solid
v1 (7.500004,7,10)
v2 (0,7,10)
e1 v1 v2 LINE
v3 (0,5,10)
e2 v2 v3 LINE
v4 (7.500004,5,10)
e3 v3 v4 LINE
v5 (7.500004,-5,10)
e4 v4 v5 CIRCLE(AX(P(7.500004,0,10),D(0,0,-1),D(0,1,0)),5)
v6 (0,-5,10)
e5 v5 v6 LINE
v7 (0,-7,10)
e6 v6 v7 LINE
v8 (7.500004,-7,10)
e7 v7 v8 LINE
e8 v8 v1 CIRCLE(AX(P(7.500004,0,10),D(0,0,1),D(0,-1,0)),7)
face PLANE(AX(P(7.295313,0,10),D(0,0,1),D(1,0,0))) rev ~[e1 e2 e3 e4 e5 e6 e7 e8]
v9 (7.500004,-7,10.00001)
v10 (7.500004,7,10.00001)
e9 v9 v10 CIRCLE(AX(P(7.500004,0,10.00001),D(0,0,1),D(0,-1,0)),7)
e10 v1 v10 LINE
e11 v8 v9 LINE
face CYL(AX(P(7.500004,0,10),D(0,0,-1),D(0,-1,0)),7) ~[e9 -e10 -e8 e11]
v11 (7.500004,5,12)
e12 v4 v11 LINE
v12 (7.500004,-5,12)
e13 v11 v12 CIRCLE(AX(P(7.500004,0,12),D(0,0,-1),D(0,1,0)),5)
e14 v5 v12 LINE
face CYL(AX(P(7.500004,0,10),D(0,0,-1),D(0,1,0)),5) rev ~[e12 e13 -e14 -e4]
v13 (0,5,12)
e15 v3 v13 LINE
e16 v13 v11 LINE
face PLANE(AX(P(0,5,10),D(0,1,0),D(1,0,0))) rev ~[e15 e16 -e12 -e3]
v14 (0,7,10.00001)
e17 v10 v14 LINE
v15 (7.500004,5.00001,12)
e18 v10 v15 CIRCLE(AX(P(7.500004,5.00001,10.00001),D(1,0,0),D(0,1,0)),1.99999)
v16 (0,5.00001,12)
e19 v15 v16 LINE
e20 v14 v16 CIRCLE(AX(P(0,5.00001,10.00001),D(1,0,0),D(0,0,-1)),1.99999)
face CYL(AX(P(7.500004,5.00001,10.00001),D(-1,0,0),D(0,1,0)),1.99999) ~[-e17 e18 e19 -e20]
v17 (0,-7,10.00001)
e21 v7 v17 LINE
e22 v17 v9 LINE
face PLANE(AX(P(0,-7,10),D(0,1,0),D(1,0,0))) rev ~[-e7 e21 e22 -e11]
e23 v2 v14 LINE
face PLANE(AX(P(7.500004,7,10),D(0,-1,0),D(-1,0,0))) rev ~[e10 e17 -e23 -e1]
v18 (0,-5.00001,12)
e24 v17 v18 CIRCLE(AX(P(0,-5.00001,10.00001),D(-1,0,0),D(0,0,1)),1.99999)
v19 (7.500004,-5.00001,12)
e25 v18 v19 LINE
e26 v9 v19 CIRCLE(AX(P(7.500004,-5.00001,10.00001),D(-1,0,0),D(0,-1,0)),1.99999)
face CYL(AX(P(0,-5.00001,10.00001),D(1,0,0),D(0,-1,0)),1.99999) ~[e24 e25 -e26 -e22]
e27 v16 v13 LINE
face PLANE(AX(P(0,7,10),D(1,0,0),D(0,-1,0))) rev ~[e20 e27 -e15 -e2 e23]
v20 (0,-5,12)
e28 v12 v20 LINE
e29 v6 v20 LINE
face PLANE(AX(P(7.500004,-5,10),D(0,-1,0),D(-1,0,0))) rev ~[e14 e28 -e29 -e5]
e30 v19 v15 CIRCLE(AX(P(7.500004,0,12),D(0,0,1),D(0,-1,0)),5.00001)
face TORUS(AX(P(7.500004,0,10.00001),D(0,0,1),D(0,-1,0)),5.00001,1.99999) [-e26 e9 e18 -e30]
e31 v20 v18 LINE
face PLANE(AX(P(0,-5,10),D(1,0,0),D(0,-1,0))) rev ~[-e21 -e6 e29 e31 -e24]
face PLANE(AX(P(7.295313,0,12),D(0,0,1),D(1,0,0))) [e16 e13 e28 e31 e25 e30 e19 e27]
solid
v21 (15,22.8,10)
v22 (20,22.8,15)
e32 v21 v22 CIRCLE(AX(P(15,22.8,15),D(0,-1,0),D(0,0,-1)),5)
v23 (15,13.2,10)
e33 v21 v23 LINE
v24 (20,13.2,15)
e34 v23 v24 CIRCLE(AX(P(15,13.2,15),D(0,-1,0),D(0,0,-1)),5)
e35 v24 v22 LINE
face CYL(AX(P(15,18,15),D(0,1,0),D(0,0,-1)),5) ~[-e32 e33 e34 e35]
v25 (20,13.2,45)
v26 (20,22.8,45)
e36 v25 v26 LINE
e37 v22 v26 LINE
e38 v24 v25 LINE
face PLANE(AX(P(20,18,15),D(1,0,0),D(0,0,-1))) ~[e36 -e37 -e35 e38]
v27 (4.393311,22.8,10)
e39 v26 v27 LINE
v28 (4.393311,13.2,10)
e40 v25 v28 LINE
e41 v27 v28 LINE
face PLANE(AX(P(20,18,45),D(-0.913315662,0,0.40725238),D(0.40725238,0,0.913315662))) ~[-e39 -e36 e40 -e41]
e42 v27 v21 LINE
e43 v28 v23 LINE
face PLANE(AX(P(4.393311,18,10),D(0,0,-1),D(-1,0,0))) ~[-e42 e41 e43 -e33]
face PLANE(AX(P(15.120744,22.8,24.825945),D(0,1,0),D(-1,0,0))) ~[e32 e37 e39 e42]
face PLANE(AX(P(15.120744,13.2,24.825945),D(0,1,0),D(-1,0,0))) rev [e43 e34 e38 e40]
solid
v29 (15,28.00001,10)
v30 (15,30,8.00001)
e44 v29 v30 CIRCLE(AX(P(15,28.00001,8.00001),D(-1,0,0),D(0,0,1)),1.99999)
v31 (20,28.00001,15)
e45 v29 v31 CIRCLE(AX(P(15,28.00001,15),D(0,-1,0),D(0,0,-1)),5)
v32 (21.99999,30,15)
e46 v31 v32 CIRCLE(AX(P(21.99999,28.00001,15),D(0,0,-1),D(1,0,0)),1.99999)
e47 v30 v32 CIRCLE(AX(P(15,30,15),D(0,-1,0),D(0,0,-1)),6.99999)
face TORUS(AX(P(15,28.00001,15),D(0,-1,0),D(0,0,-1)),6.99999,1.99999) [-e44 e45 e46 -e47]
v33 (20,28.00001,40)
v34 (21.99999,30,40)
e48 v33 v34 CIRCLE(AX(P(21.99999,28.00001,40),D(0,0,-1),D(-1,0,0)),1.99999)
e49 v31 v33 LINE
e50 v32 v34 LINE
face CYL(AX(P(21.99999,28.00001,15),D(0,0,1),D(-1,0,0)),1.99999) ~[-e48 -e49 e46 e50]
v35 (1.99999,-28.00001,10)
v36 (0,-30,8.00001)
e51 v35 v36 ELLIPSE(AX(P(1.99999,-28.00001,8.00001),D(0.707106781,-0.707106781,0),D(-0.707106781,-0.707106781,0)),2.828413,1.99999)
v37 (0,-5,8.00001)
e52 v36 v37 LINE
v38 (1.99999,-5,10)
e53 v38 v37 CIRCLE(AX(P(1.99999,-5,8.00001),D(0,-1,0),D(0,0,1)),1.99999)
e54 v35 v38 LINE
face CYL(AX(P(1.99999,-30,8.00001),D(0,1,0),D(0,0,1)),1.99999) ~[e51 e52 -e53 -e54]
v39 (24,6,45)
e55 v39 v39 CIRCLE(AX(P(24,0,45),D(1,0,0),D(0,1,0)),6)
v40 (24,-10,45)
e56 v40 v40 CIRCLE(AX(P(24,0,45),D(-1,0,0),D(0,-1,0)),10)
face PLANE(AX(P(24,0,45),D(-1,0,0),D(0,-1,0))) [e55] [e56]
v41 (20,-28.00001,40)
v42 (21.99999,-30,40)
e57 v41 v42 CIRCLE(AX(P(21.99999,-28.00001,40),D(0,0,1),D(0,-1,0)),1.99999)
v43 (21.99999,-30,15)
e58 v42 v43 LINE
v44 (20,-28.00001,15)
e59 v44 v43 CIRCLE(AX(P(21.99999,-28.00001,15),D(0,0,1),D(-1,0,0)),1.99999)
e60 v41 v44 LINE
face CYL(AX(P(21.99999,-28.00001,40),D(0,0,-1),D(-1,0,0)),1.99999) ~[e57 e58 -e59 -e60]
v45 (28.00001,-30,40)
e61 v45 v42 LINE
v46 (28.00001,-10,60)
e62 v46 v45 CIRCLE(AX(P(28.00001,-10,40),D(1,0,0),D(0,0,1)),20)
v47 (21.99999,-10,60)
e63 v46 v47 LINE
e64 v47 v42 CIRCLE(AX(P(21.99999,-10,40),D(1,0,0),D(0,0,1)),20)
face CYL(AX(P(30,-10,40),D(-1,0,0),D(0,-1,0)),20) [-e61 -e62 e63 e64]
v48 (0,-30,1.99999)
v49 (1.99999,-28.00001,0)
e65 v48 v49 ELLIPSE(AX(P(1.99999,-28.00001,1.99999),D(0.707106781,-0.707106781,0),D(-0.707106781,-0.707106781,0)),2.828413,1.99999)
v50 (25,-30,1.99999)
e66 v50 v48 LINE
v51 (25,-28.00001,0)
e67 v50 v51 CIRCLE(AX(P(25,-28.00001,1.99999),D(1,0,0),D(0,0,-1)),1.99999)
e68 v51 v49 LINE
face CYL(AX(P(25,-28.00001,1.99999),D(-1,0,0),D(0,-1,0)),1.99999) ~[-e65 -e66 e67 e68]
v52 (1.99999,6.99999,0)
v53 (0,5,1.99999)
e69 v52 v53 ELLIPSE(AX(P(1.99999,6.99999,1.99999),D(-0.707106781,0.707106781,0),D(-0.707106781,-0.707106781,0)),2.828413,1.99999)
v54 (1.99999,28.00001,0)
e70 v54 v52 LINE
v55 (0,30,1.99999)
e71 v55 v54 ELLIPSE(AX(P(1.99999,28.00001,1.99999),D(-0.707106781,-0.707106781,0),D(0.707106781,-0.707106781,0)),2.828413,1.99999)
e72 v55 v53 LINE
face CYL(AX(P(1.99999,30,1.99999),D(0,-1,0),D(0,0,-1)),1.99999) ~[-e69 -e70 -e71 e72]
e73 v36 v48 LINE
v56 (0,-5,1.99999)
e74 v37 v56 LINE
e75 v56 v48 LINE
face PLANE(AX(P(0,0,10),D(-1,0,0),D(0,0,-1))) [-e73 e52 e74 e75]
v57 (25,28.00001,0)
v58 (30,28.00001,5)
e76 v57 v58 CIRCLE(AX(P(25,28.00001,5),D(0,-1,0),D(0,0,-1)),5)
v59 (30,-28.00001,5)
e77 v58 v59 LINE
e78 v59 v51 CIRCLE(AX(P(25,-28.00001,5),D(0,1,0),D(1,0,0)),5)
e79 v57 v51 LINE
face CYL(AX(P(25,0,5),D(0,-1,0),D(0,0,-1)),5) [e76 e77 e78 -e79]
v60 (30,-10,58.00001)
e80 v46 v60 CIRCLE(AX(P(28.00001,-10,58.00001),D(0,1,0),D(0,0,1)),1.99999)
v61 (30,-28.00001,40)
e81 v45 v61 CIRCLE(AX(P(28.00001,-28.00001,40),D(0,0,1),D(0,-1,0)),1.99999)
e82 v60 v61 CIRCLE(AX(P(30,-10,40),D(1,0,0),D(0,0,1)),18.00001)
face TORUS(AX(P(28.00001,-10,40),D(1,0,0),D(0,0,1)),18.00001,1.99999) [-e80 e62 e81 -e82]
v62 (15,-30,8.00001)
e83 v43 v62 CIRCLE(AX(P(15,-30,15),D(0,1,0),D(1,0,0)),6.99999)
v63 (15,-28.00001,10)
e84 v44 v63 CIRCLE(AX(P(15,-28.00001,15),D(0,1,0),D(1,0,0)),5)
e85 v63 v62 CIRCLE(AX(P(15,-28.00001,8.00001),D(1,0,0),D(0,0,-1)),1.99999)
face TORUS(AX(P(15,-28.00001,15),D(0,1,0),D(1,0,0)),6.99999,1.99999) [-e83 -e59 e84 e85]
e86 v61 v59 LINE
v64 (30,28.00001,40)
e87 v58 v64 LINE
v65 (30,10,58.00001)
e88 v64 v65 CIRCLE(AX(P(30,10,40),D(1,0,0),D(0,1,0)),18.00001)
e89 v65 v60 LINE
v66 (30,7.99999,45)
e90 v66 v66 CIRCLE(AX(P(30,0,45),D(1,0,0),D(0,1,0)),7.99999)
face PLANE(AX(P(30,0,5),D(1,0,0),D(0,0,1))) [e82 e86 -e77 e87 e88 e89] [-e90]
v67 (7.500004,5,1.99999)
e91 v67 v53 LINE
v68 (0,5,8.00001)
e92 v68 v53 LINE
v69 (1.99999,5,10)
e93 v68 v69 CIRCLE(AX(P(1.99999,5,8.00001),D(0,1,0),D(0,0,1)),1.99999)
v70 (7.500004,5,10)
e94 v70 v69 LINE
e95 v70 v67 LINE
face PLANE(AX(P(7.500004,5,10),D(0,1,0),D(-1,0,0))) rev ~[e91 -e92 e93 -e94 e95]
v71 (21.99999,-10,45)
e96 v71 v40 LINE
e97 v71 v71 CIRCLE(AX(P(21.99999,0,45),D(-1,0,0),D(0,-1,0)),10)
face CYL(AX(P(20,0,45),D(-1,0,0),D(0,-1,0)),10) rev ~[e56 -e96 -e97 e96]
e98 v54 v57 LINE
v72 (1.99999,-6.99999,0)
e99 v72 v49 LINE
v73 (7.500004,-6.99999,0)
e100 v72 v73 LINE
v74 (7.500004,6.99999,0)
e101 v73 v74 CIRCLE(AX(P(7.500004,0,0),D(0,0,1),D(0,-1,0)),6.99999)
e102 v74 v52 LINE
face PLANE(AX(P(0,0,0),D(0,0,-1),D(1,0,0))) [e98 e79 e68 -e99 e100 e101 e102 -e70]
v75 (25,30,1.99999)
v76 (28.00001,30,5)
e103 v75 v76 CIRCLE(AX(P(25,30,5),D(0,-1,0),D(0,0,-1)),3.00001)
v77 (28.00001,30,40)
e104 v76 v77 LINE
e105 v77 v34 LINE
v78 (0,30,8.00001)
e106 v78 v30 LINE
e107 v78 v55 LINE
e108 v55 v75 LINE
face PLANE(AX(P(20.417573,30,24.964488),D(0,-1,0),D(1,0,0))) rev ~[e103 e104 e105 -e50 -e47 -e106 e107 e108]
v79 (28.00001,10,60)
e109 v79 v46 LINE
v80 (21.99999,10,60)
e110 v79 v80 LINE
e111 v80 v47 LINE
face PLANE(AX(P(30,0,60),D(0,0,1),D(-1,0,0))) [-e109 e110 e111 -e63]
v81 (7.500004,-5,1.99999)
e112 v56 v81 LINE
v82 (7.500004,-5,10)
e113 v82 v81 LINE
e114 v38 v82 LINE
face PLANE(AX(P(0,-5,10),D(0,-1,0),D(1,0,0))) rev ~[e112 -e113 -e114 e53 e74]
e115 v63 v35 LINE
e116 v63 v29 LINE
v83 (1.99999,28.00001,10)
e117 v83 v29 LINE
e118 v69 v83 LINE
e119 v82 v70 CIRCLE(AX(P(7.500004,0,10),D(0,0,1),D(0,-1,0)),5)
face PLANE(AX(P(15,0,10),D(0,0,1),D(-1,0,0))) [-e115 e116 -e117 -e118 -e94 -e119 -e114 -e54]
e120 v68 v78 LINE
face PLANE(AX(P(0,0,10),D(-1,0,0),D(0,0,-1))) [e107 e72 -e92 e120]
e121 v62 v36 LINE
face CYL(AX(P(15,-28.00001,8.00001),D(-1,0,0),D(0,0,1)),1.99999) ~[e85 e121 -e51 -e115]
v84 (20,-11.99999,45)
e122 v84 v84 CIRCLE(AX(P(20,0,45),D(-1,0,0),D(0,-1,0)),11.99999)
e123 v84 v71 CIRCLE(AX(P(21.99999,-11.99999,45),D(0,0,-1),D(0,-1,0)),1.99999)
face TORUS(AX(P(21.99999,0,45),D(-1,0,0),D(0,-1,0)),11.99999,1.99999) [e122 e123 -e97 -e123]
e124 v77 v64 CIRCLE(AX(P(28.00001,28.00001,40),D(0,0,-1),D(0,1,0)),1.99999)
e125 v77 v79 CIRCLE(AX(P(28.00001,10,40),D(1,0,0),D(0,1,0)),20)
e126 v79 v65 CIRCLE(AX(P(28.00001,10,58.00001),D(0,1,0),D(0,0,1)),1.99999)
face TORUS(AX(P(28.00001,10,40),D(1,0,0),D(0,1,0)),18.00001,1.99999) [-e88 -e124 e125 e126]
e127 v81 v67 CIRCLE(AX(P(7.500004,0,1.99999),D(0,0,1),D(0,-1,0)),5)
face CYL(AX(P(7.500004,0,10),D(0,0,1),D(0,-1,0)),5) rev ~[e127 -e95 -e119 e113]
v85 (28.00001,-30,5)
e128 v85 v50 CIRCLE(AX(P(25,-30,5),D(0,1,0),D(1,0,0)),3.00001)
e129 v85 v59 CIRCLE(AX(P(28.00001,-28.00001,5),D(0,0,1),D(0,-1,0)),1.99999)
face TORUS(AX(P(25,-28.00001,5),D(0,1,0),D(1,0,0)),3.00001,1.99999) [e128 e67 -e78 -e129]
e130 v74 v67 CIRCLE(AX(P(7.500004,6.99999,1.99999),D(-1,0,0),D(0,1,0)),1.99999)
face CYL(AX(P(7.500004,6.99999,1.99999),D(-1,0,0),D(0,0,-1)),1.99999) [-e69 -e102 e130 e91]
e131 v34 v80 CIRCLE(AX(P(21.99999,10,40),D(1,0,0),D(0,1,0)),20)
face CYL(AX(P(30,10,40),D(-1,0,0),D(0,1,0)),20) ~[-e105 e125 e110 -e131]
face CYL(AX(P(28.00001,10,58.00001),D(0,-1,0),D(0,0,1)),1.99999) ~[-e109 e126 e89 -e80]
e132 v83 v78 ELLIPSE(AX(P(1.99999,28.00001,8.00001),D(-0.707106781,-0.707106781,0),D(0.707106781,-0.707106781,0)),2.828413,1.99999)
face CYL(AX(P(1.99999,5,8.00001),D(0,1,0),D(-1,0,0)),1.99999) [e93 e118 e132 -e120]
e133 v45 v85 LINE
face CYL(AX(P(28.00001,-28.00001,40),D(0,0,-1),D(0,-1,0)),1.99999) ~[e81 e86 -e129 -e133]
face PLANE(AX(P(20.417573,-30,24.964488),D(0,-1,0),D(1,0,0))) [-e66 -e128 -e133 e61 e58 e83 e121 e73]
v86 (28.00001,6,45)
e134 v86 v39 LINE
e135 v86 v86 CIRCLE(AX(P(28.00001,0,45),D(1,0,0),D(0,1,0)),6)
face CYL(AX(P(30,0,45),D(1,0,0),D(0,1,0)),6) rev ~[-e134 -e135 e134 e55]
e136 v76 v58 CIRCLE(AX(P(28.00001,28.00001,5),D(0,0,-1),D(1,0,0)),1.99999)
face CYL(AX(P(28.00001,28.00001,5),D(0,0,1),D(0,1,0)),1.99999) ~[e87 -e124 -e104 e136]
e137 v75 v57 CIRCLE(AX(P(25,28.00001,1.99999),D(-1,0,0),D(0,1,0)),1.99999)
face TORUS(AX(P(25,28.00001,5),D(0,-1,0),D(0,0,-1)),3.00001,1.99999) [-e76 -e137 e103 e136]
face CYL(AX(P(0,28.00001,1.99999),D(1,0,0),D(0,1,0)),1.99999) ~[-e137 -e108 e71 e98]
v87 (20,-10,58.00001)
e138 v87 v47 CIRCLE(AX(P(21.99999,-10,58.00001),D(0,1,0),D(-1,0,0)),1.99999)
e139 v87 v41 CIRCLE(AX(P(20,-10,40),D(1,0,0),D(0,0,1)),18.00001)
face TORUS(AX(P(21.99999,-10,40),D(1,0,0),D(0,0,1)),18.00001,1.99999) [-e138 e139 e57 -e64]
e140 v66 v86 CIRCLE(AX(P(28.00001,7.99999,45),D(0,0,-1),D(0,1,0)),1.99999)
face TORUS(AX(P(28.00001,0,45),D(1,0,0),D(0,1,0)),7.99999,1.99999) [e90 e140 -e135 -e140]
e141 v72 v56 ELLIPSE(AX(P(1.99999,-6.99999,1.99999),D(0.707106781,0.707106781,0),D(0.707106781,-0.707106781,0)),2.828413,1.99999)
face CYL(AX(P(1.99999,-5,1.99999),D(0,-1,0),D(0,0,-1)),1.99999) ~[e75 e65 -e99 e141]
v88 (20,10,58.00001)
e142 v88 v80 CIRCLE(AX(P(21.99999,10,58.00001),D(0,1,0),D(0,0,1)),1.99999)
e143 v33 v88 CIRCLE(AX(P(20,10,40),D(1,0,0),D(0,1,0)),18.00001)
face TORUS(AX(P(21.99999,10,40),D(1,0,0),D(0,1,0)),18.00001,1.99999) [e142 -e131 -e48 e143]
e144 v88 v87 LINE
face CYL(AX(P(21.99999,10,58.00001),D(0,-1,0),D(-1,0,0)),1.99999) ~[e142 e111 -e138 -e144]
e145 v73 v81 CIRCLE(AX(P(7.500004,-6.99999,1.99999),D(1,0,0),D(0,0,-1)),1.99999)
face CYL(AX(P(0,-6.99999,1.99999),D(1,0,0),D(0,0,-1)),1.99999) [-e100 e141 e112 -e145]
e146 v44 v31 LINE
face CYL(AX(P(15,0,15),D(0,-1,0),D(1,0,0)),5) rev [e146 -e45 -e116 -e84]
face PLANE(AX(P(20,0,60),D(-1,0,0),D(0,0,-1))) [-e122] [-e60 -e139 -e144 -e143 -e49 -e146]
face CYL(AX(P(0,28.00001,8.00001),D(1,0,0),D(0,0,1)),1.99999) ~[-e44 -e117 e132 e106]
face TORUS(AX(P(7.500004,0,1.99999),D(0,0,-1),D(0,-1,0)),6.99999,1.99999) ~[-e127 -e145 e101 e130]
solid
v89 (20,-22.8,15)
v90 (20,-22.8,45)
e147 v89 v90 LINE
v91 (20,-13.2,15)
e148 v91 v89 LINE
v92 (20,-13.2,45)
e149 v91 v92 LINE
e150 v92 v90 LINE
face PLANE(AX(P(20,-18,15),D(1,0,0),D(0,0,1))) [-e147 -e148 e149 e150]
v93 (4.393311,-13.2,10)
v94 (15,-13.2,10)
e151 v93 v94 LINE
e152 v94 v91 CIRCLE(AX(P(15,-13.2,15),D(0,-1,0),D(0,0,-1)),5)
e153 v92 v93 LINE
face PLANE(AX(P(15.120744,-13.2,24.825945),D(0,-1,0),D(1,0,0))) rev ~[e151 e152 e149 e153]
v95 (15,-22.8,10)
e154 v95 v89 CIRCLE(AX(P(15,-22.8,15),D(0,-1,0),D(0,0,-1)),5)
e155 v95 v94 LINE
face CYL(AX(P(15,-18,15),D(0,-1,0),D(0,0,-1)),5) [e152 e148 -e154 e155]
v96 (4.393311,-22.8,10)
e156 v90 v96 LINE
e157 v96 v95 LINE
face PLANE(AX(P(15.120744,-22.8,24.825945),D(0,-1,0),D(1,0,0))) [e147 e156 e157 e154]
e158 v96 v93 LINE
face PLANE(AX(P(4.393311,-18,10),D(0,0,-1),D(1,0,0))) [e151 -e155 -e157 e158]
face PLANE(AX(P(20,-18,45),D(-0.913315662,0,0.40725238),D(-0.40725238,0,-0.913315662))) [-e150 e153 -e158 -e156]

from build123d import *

# Parameters (mm, degrees)
F1_DEPTH  = 30
F2_R      = 6
F3_DEPTH  = 10
F4_R      = 10
F5_DEPTH  = 4
F7_DEPTH  = 10
F10_DEPTH = 4.8
F12_DEPTH = 2
F13_R     = 20
F14_R     = 1.99999
F14_2_R   = 1.99999


# Not quite as in the source:
# - a fillet or chamfer is up to 0.001 mm smaller than in the source, because OpenCascade refuses the exact size
# - a pattern or mirror of a feature is missing from the dataset's text; its kind, count and spacing are read off the source's solid


with BuildPart() as f1:
    # F0 (on Front) → F1 (new body, symmetric)
    with BuildSketch(Plane.XZ):
        with BuildLine():
            Line((0, 10), (0, 0))
            Line((0, 0), (25, 0))
            ThreePointArc((25, 0), (28.5355339059, 1.4644660941), (30, 5))
            Line((30, 5), (30, 60))
            Line((30, 60), (20, 60))
            Line((20, 60), (20, 15))
            ThreePointArc((20, 15), (18.5355339059, 11.4644660941), (15, 10))
            Line((15, 10), (0, 10))
        make_face()
    extrude(amount=F1_DEPTH, both=True)

    # F2 (on face) → F3 (cut, through all)
    with BuildSketch(Plane.YZ.offset(30)):
        with Locations((0, 45)):
            Circle(F2_R)
    extrude(amount=-F3_DEPTH, mode=Mode.SUBTRACT)

    # F4 (on face) → F5 (cut)
    with BuildSketch(Plane(origin=(20, 0, 0), x_dir=(0, -1, 0), z_dir=(-1, 0, 0))):
        with Locations((0, 45)):
            Circle(F4_R)
    extrude(amount=-F5_DEPTH, mode=Mode.SUBTRACT)

    # F6 (on face) → F7 (cut, through all)
    with BuildSketch(Plane.XY.offset(10)):
        with BuildLine():
            Line((0, -5), (7.5000035577, -5))
            ThreePointArc((7.5000035577, -5), (12.5000035577, 0), (7.5000035577, 5))
            Line((7.5000035577, 5), (0, 5))
            Line((0, 5), (0, -5))
        make_face()
    extrude(amount=-F7_DEPTH, mode=Mode.SUBTRACT)

    # F13
    f13_edges = [f1.edges().sort_by_distance(p)[0] for p in [
        (25, 30, 60),
        (25, -30, 60),
    ]]
    fillet(f13_edges, radius=F13_R)

    # F14 (radius 2 in the source; OpenCascade refuses exactly that, so slightly less here)
    f14_edges = [f1.edges().sort_by_distance(p)[0] for p in [
        (7.5, -30, 10),
        (0, -17.5, 10),
        (0, 17.5, 10),
        (20, 30, 27.5),
        (20, 24.142136, 54.142136),
        (20, 0, 15),
        (20, 0, 60),
        (20, -30, 27.5),
        (20, -24.142136, 54.142136),
        (20, 10, 45),
        (30, 30, 22.5),
        (30, 24.142136, 54.142136),
        (30, 0, 5),
        (30, 0, 60),
        (30, -30, 22.5),
        (30, -24.142136, 54.142136),
        (30, -6, 45),
        (0, 17.5, 0),
        (3.750002, 5, 0),
        (12.500004, 0, 0),
        (3.750002, -5, 0),
        (0, -17.5, 0),
        (12.5, -30, 0),
        (25, 0, 0),
        (12.5, 30, 0),
        (28.535534, -30, 1.464466),
        (18.535534, -30, 11.464466),
        (28.535534, 30, 1.464466),
        (18.535534, 30, 11.464466),
        (7.5, 30, 10),
    ]]
    fillet(f14_edges, radius=F14_R)


with BuildPart() as f10:
    # F9 (on offset) → F10 (new body, symmetric)
    with BuildSketch(Plane.XZ.offset(18)):
        with BuildLine():
            ThreePointArc((15, 10), (18.5355339059, 11.4644660941), (20, 15))
            Line((20, 15), (20, 45))
            Line((20, 45), (4.3933112174, 10))
            Line((4.3933112174, 10), (15, 10))
        make_face()
    extrude(amount=F10_DEPTH, both=True)


with BuildPart() as f10_copies_1:
    # F10_copies: instance of F10
    add(f10.part.mirror(Plane.ZX))


with BuildPart() as f12:
    # F11 (on face) → F12 (new body)
    with BuildSketch(Plane.XY.offset(10)):
        with BuildLine():
            ThreePointArc((7.5000035577, 5), (12.5000035577, 0), (7.5000035577, -5))
            Line((7.5000035577, -5), (0, -5))
            Line((0, -5), (0, -7))
            Line((0, -7), (7.5000035577, -7))
            ThreePointArc((7.5000035577, -7), (14.5000035577, 0), (7.5000035577, 7))
            Line((7.5000035577, 7), (0, 7))
            Line((0, 7), (0, 5))
            Line((0, 5), (7.5000035577, 5))
        make_face()
    extrude(amount=F12_DEPTH)

    # F14#2 (radius 2 in the source; OpenCascade refuses exactly that, so slightly less here)
    f14_2_edges = [f12.edges().sort_by_distance(p)[0] for p in [
        (3.750002, -7, 12),
        (14.500004, 0, 12),
        (3.750002, 7, 12),
    ]]
    fillet(f14_2_edges, radius=F14_2_R)


solid = Compound([f1.part, f10.part, f10_copies_1.part, f12.part])
